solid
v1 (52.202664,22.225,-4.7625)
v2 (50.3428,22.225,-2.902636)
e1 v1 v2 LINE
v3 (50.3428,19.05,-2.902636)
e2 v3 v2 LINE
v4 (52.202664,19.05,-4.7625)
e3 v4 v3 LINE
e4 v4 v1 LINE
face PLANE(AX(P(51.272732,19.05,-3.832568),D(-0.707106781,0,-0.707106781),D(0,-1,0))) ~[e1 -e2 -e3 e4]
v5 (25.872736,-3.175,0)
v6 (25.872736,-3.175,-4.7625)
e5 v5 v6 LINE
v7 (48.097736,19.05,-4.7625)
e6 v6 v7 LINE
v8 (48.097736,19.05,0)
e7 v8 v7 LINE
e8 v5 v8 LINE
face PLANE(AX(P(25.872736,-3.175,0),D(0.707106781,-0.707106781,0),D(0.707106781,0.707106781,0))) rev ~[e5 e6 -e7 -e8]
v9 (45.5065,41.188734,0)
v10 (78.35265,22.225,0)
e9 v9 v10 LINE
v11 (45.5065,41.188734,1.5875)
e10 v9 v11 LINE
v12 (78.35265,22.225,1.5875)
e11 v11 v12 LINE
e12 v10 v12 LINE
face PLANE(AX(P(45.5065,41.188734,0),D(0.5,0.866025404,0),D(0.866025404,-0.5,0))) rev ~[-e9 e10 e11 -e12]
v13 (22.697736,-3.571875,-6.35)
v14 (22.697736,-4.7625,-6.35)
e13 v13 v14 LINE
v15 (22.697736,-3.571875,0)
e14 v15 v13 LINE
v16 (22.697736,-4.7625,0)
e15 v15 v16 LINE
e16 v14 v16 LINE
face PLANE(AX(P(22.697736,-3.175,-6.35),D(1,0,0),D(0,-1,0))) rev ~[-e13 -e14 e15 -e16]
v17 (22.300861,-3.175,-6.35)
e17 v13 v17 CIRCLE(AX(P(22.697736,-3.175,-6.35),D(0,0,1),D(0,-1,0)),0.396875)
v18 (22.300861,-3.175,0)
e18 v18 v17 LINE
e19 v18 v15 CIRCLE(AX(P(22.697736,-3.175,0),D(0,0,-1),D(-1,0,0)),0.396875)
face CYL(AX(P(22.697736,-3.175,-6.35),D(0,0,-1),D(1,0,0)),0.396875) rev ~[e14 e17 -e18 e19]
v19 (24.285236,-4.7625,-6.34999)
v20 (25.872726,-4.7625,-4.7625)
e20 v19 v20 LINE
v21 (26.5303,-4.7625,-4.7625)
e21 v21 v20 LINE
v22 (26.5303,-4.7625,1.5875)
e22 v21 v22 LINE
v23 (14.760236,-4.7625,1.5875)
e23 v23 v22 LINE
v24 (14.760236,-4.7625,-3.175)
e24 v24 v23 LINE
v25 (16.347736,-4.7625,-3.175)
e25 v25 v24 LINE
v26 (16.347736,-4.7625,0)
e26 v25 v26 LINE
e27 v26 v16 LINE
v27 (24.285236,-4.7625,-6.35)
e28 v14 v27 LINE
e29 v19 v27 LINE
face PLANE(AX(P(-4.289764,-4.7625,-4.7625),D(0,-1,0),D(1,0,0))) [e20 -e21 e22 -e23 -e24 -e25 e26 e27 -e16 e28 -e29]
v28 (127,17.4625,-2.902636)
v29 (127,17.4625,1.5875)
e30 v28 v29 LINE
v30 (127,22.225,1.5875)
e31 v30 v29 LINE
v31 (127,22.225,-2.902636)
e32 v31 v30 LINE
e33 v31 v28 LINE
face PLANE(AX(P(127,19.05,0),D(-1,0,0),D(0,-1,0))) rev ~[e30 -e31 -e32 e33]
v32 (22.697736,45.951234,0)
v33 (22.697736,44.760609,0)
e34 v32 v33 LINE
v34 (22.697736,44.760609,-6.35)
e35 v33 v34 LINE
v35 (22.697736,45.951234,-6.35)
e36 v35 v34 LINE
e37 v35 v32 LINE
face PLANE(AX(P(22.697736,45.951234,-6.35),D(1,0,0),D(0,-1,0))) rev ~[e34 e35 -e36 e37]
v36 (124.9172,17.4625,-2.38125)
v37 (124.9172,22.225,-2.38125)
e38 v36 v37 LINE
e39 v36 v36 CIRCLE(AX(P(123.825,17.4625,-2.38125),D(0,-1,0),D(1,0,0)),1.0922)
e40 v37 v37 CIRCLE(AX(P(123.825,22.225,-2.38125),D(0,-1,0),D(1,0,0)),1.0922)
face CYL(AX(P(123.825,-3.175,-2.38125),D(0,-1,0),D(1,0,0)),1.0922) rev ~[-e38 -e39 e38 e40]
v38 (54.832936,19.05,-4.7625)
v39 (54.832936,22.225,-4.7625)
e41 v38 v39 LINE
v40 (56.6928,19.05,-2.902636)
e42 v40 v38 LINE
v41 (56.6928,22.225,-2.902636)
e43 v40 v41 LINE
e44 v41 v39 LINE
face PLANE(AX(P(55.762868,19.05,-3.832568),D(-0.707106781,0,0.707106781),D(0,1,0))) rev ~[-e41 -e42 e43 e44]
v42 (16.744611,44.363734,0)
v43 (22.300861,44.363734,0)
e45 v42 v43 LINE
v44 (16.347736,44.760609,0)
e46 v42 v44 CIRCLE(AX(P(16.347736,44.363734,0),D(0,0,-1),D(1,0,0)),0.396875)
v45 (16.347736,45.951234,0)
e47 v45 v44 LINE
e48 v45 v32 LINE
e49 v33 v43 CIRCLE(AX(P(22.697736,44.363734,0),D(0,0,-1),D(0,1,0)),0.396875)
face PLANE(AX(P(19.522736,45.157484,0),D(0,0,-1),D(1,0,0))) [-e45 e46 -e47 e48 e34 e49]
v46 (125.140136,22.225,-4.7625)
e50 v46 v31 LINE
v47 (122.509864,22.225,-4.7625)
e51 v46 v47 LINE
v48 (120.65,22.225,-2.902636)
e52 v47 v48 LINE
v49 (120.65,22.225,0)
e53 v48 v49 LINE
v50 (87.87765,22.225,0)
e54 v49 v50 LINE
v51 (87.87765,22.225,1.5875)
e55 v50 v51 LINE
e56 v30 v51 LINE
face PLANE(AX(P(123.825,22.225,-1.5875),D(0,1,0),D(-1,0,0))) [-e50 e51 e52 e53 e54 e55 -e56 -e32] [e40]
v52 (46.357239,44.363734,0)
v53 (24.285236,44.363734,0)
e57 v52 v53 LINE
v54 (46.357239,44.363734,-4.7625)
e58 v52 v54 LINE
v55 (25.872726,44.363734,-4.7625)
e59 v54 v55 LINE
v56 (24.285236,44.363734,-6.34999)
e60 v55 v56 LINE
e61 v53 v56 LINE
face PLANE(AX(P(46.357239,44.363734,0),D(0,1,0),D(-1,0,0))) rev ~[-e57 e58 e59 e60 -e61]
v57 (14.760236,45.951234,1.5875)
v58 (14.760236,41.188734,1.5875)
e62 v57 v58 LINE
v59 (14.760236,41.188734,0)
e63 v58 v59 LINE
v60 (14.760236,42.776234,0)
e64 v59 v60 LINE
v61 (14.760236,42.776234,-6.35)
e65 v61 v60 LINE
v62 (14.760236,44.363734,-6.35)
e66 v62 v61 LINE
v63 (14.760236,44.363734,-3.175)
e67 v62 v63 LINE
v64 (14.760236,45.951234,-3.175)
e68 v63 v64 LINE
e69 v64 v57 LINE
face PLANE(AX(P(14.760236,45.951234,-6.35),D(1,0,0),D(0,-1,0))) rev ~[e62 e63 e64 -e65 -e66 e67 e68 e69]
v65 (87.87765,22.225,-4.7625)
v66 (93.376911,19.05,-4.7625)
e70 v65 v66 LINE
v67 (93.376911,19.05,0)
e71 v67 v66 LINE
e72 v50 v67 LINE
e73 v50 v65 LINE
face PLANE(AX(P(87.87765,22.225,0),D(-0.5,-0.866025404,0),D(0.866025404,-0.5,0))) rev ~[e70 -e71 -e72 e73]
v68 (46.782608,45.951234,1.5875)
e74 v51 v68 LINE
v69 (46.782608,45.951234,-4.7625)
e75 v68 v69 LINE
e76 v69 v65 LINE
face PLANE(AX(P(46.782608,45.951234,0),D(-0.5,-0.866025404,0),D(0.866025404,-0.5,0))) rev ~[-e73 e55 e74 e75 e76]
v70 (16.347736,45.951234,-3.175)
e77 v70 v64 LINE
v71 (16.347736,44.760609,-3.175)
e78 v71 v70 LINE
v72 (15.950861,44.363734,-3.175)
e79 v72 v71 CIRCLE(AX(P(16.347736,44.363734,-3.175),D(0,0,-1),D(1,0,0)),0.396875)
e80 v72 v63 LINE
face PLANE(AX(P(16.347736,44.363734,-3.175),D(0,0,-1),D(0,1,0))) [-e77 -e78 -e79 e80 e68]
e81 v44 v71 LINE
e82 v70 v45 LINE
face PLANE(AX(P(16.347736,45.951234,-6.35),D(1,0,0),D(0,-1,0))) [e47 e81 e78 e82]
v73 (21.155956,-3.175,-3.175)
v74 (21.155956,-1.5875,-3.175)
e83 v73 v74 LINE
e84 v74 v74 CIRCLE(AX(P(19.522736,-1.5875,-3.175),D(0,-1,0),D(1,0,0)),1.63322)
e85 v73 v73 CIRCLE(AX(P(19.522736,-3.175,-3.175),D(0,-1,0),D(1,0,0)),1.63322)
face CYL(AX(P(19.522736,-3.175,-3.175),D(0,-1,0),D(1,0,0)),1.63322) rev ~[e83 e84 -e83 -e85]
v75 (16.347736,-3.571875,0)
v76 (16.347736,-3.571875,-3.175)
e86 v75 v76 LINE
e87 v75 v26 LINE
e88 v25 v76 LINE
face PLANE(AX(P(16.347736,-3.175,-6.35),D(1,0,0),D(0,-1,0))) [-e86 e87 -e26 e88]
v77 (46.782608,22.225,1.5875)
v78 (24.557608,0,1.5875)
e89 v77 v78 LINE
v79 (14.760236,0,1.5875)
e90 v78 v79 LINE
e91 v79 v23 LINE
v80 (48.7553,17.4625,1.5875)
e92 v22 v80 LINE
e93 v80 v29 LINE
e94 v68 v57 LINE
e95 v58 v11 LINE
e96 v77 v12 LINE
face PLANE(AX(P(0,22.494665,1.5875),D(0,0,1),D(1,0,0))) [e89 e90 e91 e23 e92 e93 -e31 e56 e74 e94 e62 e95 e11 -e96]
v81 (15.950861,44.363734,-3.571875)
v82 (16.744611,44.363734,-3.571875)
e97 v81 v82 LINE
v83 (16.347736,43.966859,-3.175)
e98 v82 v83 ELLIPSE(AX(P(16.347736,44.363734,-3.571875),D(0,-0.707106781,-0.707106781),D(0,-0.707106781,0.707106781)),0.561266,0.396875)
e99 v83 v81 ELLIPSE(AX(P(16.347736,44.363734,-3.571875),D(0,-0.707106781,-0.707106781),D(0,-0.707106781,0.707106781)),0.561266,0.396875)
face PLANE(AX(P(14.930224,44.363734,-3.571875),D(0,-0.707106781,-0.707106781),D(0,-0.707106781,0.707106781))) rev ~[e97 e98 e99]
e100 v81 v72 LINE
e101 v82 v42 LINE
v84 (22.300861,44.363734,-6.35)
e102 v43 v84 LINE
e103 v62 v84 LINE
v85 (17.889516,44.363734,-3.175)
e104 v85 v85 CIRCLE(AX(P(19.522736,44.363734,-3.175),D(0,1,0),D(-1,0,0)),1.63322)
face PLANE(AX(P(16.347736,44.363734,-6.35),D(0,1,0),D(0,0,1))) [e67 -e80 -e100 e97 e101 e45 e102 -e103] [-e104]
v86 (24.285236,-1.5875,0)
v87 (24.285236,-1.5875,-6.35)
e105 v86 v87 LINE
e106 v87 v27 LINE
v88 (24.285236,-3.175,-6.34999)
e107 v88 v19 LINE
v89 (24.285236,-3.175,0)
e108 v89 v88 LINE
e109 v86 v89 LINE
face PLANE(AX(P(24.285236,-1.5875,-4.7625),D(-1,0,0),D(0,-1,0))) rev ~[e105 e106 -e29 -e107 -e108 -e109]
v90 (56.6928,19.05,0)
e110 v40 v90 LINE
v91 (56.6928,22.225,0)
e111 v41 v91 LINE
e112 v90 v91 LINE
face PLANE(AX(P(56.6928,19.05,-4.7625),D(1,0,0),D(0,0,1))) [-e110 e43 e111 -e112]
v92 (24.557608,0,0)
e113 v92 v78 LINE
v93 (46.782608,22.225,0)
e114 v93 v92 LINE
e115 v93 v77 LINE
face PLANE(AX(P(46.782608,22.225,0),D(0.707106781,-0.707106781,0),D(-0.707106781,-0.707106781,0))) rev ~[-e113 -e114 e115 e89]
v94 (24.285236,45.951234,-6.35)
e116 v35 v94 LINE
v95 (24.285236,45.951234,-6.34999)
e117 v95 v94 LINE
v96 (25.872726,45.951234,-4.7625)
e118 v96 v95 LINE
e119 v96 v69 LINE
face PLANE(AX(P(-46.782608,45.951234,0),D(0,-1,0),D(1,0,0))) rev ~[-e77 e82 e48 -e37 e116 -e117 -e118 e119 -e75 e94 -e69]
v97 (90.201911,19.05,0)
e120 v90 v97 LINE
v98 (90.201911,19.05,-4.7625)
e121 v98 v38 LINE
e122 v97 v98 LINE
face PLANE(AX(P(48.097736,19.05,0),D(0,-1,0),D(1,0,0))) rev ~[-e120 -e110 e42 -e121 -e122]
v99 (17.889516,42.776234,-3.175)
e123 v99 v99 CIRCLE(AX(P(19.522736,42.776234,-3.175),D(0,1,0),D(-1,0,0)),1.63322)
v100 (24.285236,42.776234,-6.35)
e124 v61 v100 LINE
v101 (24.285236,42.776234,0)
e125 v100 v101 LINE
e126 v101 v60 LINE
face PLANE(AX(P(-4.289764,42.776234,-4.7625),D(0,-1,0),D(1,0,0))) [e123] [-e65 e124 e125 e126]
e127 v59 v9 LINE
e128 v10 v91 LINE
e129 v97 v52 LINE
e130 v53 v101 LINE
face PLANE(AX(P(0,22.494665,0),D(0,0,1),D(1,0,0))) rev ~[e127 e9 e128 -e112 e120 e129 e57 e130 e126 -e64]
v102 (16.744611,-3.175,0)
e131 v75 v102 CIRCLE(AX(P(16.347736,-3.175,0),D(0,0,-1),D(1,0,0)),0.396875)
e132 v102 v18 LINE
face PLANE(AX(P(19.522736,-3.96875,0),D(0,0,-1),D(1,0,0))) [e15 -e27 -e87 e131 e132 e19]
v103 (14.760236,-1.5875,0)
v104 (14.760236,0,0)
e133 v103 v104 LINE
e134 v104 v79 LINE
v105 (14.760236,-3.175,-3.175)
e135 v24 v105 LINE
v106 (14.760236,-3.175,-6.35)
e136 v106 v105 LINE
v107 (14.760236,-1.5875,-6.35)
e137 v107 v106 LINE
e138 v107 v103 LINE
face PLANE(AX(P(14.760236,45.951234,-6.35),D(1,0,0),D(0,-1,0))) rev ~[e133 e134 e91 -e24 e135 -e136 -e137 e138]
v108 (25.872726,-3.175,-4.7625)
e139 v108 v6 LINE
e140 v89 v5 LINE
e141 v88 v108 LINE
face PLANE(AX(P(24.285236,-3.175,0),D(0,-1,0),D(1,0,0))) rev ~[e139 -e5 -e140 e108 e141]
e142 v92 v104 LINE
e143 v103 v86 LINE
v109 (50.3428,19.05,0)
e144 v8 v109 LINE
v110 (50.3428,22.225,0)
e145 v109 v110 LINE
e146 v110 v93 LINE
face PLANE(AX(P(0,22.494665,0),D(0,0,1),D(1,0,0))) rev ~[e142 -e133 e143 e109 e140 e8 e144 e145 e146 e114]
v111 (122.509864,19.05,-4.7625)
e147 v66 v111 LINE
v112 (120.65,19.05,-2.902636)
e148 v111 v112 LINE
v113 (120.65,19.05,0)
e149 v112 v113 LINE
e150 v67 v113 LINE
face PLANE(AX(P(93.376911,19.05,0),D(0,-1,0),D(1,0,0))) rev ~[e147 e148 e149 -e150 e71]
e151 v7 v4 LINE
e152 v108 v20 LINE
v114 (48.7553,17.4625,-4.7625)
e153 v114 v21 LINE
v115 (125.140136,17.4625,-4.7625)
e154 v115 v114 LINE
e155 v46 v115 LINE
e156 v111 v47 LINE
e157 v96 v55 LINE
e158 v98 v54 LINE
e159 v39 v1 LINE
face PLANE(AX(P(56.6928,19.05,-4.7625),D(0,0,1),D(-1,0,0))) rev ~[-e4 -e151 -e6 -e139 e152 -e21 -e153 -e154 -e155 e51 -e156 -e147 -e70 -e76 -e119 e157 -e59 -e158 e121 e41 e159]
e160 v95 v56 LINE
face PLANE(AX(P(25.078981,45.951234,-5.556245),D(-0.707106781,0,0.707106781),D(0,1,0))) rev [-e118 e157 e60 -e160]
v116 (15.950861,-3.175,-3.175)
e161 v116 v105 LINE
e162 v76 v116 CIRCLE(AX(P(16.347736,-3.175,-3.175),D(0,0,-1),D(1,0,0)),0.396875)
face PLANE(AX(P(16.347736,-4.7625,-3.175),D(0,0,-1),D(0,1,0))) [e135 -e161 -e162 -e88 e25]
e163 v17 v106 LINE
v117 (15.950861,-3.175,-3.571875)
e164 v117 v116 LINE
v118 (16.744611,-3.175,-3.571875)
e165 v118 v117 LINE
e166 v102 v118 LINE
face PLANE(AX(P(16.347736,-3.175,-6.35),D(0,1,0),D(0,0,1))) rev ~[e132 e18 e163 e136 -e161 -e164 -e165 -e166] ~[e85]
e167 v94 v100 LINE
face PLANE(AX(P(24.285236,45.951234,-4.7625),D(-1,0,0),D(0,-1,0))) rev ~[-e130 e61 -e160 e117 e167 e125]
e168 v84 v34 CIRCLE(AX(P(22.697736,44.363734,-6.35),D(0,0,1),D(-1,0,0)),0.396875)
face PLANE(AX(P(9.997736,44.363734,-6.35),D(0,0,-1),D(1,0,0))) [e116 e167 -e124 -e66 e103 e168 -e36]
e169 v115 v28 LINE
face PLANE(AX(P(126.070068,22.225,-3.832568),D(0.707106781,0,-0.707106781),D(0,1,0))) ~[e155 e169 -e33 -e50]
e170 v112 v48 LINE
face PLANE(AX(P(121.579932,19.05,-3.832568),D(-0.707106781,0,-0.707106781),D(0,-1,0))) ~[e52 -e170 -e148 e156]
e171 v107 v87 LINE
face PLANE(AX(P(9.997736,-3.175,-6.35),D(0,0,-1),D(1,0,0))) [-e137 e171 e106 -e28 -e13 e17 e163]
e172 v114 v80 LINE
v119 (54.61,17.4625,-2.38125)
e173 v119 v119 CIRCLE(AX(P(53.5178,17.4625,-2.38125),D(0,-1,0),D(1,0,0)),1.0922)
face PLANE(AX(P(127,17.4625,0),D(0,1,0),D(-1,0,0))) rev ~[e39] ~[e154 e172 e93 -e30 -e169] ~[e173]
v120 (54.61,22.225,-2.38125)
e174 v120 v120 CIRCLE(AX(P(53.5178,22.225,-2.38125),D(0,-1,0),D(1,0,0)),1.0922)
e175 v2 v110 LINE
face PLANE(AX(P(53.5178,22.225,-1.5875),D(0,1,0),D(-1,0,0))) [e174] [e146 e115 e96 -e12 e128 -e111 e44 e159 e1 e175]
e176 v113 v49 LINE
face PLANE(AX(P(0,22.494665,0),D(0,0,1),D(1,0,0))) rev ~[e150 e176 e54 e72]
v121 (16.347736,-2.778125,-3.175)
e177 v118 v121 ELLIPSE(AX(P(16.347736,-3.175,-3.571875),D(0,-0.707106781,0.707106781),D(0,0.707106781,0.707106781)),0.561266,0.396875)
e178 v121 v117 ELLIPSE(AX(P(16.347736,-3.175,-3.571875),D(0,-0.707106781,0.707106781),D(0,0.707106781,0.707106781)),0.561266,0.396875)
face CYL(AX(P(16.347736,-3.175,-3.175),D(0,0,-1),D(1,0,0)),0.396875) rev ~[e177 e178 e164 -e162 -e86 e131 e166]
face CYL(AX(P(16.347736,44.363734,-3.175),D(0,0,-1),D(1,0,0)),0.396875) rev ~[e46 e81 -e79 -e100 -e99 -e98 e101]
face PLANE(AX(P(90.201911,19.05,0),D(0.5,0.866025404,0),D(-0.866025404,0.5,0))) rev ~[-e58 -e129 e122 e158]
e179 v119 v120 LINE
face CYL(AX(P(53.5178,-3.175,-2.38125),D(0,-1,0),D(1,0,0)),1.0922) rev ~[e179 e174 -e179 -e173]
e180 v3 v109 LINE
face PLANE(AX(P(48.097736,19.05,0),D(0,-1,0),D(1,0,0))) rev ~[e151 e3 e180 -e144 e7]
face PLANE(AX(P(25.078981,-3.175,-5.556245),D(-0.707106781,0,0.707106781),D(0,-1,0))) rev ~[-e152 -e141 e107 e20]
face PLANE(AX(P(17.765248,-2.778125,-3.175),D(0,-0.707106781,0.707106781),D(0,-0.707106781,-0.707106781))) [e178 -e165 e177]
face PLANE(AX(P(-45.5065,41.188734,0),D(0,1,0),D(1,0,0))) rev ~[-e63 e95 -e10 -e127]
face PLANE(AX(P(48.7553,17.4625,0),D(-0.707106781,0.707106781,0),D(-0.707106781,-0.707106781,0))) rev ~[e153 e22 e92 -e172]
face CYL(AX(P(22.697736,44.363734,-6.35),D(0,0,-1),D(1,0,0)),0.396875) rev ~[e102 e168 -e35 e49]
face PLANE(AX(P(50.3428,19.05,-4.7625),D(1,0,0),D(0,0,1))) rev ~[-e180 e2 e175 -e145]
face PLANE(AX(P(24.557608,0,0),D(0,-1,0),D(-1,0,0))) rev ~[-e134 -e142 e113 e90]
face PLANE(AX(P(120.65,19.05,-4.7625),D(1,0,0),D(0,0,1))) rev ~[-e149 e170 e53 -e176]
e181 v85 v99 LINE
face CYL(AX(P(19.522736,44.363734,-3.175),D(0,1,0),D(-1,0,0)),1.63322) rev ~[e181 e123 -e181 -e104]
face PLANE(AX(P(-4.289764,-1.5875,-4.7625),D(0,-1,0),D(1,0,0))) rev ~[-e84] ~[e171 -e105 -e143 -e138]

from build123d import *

# Parameters (mm, degrees)
F1_DEPTH      = 1.5875
F3_DEPTH      = 4.7625
F4_W          = 6.35
F4_H          = 6.35
F4_W_2        = 4.7625
F4_H_2        = 4.7625
F5_DEPTH      = 3.175
F6_SIZE       = 1.8598642
F7_W          = 28.575
F7_H          = 3.175
F8_DEPTH      = 1.5875
F9_W          = 6.35
F9_H          = 1.5875
F10_DEPTH     = 6.35
F11_R         = 1.0922
F11_R_2       = 1.63322
F12_DEPTH     = 25.4
F13_SIZE      = 1.58749
F14_R         = 0.396875
F15_DEPTH     = 6.35
F16_R         = 1.63322
F17_DEPTH     = 1.5875
F18_W         = 141.7602359697
F18_H         = 50.7137336135
F19_DEPTH     = 7.9375
F20_W         = 1.5875
F20_H         = 3.175
F21_DEPTH     = 1.5875
F22_R         = 0.396875
F23_DEPTH     = 3.175
F24_T4_DEPTH  = 1.4175116858
F24_S5_R      = 0.396875
F24_T6_DEPTH  = 2
F24_T10_DEPTH = 1.4175116858
F24_S11_R     = 0.396875
F24_T12_DEPTH = 2
F24_T16_DEPTH = 2.8350233717
F24_S17_R     = 0.396875
F24_T18_DEPTH = 3


# Not quite as in the source:
# - a fillet or chamfer that OpenCascade refuses, or shapes differently, is made with other operations: its cross-section is extruded or revolved along the edge and cut away or added
# - a fillet or chamfer is up to 0.001 mm smaller than in the source, because OpenCascade refuses the exact size


with BuildPart() as f1:
    # F0 (on Top) → F1 (new body)
    with BuildSketch(Plane.XY):
        Polygon((-87.87765, 22.225), (-127, 22.225), (-127, 17.4625), (-48.7553, 17.4625), (-26.5303, -4.7625), (26.5303, -4.7625), (48.7553, 17.4625), (127, 17.4625), (127, 22.225), (87.87765, 22.225), (46.7826079092, 45.9512336135), (-46.7826079092, 45.9512336135), align=None)
        Polygon((-24.5576079092, 0), (-46.7826079092, 22.225), (-78.35265, 22.225), (-45.5064998802, 41.1887336135), (45.5064998802, 41.1887336135), (78.35265, 22.225), (46.7826079092, 22.225), (24.5576079092, 0), align=None, mode=Mode.SUBTRACT)
    extrude(amount=F1_DEPTH)

    # F2 (on face) → F3 (join)
    with BuildSketch(Plane(origin=(0, 0, 0), x_dir=(1, 0, 0), z_dir=(0, 0, -1))):
        Polygon((-48.7553, -17.4625), (-127, -17.4625), (-127, -19.05), (-93.376911314, -19.05), (-87.87765, -22.225), (-46.7826079092, -45.9512336135), (46.7826079092, -45.9512336135), (87.87765, -22.225), (93.376911314, -19.05), (127, -19.05), (127, -17.4625), (48.7553, -17.4625), (26.5303, 4.7625), (-26.5303, 4.7625), align=None)
        Polygon((-48.0977359697, -19.05), (-25.8727359697, 3.175), (-4.2897640303, 3.175), (-4.2897640303, 1.5875), (24.2852359697, 1.5875), (24.2852359697, 3.175), (25.8727359697, 3.175), (48.0977359697, -19.05), (90.201911314, -19.05), (46.3572385662, -44.3637336135), (24.2852359697, -44.3637336135), (24.2852359697, -42.7762336135), (-4.2897640303, -42.7762336135), (-4.2897640303, -44.3637336135), (-46.3572385662, -44.3637336135), (-90.201911314, -19.05), align=None, mode=Mode.SUBTRACT)
    extrude(amount=F3_DEPTH)

    # F4 (on face) → F5 (join, through all)
    with BuildSketch(Plane(origin=(0, 19.05, 0), x_dir=(-1, 0, 0), z_dir=(0, 1, 0))):
        with Locations((-53.5178, -1.5875)):
            Rectangle(F4_W, F4_H)
        with Locations((-123.825, -1.5875)):
            Rectangle(F4_W, F4_H)
        with Locations((124.61875, -2.38125)):
            Rectangle(F4_W_2, F4_H_2)
        with Locations((55.89905, -2.38125)):
            Rectangle(F4_W_2, F4_H_2)
    extrude(amount=F5_DEPTH)

    # F6
    f6_edges = [f1.edges().sort_by_distance(p)[0] for p in [
        (-127, 19.84375, -4.7625),
        (-122.2375, 20.6375, -4.7625),
        (-58.2803, 20.6375, -4.7625),
        (-53.5178, 20.6375, -4.7625),
        (50.3428, 20.6375, -4.7625),
        (56.6928, 20.6375, -4.7625),
        (120.65, 20.6375, -4.7625),
        (127, 19.84375, -4.7625),
    ]]
    chamfer(f6_edges, length=F6_SIZE)

    # F7 (on face) → F8 (join)
    with BuildSketch(Plane(origin=(0, 0, -4.7625), x_dir=(1, 0, 0), z_dir=(0, 0, -1))):
        with Locations((9.9977359697, 3.175)):
            Rectangle(F7_W, F7_H)
        with Locations((9.9977359697, -44.3637336135)):
            Rectangle(F7_W, F7_H)
    extrude(amount=F8_DEPTH)

    # F9 (on face) → F10 (cut, through all)
    with BuildSketch(Plane(origin=(0, 0, -6.35), x_dir=(1, 0, 0), z_dir=(0, 0, -1))):
        with Locations((19.5227359697, 3.96875)):
            Rectangle(F9_W, F9_H)
        with Locations((19.5227359697, -45.1574836135)):
            Rectangle(F9_W, F9_H)
    extrude(amount=-F10_DEPTH, mode=Mode.SUBTRACT)

    # F11 (on face) → F12 (cut, through all)
    with BuildSketch(Plane.XZ.offset(3.175)):
        with Locations((53.5178, -2.38125)):
            Circle(F11_R)
        with Locations((123.825, -2.38125)):
            Circle(F11_R)
        with Locations((-124.61875, -2.38125)):
            Circle(F11_R)
        with Locations((-55.89905, -2.38125)):
            Circle(F11_R)
        with Locations((19.5227359697, -3.175)):
            Circle(F11_R_2)
    extrude(amount=-F12_DEPTH, mode=Mode.SUBTRACT)

    # F13 (size 1.5875 in the source; OpenCascade refuses exactly that, so slightly less here)
    f13_edges = [f1.edges().sort_by_distance(p)[0] for p in [
        (-4.289764, -3.96875, -4.7625),
        (24.285236, -3.96875, -4.7625),
        (-4.289764, 45.157484, -4.7625),
        (24.285236, 45.157484, -4.7625),
    ]]
    chamfer(f13_edges, length=F13_SIZE)

    # F14 (on face) → F15 (cut, through all)
    with BuildSketch(Plane(origin=(0, 0, -6.35), x_dir=(1, 0, 0), z_dir=(0, 0, -1))):
        with Locations((22.6977359697, 3.175)):
            Circle(F14_R)
        with Locations((22.6977359697, -44.3637336135)):
            Circle(F14_R)
    extrude(amount=-F15_DEPTH, mode=Mode.SUBTRACT)

    # F16 (on face) → F17 (cut, through all)
    with BuildSketch(Plane(origin=(0, 44.3637336135, 0), x_dir=(-1, 0, 0), z_dir=(0, 1, 0))):
        with Locations((-19.5227359697, -3.175)):
            Circle(F16_R)
    extrude(amount=-F17_DEPTH, mode=Mode.SUBTRACT)

    # F18 (on face) → F19 (cut, through all)
    with BuildSketch(Plane(origin=(0, 0, -6.35), x_dir=(1, 0, 0), z_dir=(0, 0, -1))):
        with Locations((-56.1198820151, -20.5943668067)):
            Rectangle(F18_W, F18_H)
    extrude(amount=-F19_DEPTH, mode=Mode.SUBTRACT)

    # F20 (on face) → F21 (cut, through all)
    with BuildSketch(Plane.YZ.offset(16.3477359697)):
        with Locations((-3.96875, -4.7625)):
            Rectangle(F20_W, F20_H)
        with Locations((45.1574836135, -4.7625)):
            Rectangle(F20_W, F20_H)
    extrude(amount=-F21_DEPTH, mode=Mode.SUBTRACT)

    # F22 (on face) → F23 (cut, through all)
    with BuildSketch(Plane(origin=(0, 0, -3.175), x_dir=(1, 0, 0), z_dir=(0, 0, -1))):
        with Locations((16.3477359697, -44.3637336135)):
            Circle(F22_R)
        with Locations((16.3477359697, 3.175)):
            Circle(F22_R)
    extrude(amount=-F23_DEPTH, mode=Mode.SUBTRACT)

    # F24: chamfer of 0.396875 on 3 edges, made by hand


with BuildPart() as f24_tool2:
    # F24_s3 → F24_t4 (new body)
    with BuildSketch(Plane.YZ.offset(17.7652476556)):
        Polygon((-2.778125, -3.175), (-3.175, -3.571875), (-3.175, -3.175), align=None)
    extrude(amount=-F24_T4_DEPTH)

    # F24_s5 → F24_t6 (intersect, symmetric)
    with BuildSketch(Plane.XY.offset(-3.4)):
        with Locations((16.3477359697, -3.175)):
            Circle(F24_S5_R)
    extrude(amount=F24_T6_DEPTH, both=True, mode=Mode.INTERSECT)


with BuildPart() as f1_1:
    add(f1.part)

    # F24_t1: cut F24_tool2
    add(f24_tool2.part, mode=Mode.SUBTRACT)


with BuildPart() as f24_tool8:
    # F24_s9 → F24_t10 (new body)
    with BuildSketch(Plane.YZ.offset(16.3477359697)):
        Polygon((-2.778125, -3.175), (-3.175, -3.571875), (-3.175, -3.175), align=None)
    extrude(amount=-F24_T10_DEPTH)

    # F24_s11 → F24_t12 (intersect, symmetric)
    with BuildSketch(Plane.XY.offset(-3.4)):
        with Locations((16.3477359697, -3.175)):
            Circle(F24_S11_R)
    extrude(amount=F24_T12_DEPTH, both=True, mode=Mode.INTERSECT)


with BuildPart() as f1_2:
    add(f1_1.part)

    # F24_t7: cut F24_tool8
    add(f24_tool8.part, mode=Mode.SUBTRACT)


with BuildPart() as f24_tool14:
    # F24_s15 → F24_t16 (new body)
    with BuildSketch(Plane.YZ.offset(14.9302242839)):
        Polygon((44.3637336135, -3.571875), (43.9668586135, -3.175), (44.3637336135, -3.175), align=None)
    extrude(amount=F24_T16_DEPTH)

    # F24_s17 → F24_t18 (intersect, symmetric)
    with BuildSketch(Plane.XY.offset(-3.4)):
        with Locations((16.3477359697, 44.3637336135)):
            Circle(F24_S17_R)
    extrude(amount=F24_T18_DEPTH, both=True, mode=Mode.INTERSECT)


with BuildPart() as f1_3:
    add(f1_2.part)

    # F24_t13: cut F24_tool14
    add(f24_tool14.part, mode=Mode.SUBTRACT)


solid = f1_3.part
